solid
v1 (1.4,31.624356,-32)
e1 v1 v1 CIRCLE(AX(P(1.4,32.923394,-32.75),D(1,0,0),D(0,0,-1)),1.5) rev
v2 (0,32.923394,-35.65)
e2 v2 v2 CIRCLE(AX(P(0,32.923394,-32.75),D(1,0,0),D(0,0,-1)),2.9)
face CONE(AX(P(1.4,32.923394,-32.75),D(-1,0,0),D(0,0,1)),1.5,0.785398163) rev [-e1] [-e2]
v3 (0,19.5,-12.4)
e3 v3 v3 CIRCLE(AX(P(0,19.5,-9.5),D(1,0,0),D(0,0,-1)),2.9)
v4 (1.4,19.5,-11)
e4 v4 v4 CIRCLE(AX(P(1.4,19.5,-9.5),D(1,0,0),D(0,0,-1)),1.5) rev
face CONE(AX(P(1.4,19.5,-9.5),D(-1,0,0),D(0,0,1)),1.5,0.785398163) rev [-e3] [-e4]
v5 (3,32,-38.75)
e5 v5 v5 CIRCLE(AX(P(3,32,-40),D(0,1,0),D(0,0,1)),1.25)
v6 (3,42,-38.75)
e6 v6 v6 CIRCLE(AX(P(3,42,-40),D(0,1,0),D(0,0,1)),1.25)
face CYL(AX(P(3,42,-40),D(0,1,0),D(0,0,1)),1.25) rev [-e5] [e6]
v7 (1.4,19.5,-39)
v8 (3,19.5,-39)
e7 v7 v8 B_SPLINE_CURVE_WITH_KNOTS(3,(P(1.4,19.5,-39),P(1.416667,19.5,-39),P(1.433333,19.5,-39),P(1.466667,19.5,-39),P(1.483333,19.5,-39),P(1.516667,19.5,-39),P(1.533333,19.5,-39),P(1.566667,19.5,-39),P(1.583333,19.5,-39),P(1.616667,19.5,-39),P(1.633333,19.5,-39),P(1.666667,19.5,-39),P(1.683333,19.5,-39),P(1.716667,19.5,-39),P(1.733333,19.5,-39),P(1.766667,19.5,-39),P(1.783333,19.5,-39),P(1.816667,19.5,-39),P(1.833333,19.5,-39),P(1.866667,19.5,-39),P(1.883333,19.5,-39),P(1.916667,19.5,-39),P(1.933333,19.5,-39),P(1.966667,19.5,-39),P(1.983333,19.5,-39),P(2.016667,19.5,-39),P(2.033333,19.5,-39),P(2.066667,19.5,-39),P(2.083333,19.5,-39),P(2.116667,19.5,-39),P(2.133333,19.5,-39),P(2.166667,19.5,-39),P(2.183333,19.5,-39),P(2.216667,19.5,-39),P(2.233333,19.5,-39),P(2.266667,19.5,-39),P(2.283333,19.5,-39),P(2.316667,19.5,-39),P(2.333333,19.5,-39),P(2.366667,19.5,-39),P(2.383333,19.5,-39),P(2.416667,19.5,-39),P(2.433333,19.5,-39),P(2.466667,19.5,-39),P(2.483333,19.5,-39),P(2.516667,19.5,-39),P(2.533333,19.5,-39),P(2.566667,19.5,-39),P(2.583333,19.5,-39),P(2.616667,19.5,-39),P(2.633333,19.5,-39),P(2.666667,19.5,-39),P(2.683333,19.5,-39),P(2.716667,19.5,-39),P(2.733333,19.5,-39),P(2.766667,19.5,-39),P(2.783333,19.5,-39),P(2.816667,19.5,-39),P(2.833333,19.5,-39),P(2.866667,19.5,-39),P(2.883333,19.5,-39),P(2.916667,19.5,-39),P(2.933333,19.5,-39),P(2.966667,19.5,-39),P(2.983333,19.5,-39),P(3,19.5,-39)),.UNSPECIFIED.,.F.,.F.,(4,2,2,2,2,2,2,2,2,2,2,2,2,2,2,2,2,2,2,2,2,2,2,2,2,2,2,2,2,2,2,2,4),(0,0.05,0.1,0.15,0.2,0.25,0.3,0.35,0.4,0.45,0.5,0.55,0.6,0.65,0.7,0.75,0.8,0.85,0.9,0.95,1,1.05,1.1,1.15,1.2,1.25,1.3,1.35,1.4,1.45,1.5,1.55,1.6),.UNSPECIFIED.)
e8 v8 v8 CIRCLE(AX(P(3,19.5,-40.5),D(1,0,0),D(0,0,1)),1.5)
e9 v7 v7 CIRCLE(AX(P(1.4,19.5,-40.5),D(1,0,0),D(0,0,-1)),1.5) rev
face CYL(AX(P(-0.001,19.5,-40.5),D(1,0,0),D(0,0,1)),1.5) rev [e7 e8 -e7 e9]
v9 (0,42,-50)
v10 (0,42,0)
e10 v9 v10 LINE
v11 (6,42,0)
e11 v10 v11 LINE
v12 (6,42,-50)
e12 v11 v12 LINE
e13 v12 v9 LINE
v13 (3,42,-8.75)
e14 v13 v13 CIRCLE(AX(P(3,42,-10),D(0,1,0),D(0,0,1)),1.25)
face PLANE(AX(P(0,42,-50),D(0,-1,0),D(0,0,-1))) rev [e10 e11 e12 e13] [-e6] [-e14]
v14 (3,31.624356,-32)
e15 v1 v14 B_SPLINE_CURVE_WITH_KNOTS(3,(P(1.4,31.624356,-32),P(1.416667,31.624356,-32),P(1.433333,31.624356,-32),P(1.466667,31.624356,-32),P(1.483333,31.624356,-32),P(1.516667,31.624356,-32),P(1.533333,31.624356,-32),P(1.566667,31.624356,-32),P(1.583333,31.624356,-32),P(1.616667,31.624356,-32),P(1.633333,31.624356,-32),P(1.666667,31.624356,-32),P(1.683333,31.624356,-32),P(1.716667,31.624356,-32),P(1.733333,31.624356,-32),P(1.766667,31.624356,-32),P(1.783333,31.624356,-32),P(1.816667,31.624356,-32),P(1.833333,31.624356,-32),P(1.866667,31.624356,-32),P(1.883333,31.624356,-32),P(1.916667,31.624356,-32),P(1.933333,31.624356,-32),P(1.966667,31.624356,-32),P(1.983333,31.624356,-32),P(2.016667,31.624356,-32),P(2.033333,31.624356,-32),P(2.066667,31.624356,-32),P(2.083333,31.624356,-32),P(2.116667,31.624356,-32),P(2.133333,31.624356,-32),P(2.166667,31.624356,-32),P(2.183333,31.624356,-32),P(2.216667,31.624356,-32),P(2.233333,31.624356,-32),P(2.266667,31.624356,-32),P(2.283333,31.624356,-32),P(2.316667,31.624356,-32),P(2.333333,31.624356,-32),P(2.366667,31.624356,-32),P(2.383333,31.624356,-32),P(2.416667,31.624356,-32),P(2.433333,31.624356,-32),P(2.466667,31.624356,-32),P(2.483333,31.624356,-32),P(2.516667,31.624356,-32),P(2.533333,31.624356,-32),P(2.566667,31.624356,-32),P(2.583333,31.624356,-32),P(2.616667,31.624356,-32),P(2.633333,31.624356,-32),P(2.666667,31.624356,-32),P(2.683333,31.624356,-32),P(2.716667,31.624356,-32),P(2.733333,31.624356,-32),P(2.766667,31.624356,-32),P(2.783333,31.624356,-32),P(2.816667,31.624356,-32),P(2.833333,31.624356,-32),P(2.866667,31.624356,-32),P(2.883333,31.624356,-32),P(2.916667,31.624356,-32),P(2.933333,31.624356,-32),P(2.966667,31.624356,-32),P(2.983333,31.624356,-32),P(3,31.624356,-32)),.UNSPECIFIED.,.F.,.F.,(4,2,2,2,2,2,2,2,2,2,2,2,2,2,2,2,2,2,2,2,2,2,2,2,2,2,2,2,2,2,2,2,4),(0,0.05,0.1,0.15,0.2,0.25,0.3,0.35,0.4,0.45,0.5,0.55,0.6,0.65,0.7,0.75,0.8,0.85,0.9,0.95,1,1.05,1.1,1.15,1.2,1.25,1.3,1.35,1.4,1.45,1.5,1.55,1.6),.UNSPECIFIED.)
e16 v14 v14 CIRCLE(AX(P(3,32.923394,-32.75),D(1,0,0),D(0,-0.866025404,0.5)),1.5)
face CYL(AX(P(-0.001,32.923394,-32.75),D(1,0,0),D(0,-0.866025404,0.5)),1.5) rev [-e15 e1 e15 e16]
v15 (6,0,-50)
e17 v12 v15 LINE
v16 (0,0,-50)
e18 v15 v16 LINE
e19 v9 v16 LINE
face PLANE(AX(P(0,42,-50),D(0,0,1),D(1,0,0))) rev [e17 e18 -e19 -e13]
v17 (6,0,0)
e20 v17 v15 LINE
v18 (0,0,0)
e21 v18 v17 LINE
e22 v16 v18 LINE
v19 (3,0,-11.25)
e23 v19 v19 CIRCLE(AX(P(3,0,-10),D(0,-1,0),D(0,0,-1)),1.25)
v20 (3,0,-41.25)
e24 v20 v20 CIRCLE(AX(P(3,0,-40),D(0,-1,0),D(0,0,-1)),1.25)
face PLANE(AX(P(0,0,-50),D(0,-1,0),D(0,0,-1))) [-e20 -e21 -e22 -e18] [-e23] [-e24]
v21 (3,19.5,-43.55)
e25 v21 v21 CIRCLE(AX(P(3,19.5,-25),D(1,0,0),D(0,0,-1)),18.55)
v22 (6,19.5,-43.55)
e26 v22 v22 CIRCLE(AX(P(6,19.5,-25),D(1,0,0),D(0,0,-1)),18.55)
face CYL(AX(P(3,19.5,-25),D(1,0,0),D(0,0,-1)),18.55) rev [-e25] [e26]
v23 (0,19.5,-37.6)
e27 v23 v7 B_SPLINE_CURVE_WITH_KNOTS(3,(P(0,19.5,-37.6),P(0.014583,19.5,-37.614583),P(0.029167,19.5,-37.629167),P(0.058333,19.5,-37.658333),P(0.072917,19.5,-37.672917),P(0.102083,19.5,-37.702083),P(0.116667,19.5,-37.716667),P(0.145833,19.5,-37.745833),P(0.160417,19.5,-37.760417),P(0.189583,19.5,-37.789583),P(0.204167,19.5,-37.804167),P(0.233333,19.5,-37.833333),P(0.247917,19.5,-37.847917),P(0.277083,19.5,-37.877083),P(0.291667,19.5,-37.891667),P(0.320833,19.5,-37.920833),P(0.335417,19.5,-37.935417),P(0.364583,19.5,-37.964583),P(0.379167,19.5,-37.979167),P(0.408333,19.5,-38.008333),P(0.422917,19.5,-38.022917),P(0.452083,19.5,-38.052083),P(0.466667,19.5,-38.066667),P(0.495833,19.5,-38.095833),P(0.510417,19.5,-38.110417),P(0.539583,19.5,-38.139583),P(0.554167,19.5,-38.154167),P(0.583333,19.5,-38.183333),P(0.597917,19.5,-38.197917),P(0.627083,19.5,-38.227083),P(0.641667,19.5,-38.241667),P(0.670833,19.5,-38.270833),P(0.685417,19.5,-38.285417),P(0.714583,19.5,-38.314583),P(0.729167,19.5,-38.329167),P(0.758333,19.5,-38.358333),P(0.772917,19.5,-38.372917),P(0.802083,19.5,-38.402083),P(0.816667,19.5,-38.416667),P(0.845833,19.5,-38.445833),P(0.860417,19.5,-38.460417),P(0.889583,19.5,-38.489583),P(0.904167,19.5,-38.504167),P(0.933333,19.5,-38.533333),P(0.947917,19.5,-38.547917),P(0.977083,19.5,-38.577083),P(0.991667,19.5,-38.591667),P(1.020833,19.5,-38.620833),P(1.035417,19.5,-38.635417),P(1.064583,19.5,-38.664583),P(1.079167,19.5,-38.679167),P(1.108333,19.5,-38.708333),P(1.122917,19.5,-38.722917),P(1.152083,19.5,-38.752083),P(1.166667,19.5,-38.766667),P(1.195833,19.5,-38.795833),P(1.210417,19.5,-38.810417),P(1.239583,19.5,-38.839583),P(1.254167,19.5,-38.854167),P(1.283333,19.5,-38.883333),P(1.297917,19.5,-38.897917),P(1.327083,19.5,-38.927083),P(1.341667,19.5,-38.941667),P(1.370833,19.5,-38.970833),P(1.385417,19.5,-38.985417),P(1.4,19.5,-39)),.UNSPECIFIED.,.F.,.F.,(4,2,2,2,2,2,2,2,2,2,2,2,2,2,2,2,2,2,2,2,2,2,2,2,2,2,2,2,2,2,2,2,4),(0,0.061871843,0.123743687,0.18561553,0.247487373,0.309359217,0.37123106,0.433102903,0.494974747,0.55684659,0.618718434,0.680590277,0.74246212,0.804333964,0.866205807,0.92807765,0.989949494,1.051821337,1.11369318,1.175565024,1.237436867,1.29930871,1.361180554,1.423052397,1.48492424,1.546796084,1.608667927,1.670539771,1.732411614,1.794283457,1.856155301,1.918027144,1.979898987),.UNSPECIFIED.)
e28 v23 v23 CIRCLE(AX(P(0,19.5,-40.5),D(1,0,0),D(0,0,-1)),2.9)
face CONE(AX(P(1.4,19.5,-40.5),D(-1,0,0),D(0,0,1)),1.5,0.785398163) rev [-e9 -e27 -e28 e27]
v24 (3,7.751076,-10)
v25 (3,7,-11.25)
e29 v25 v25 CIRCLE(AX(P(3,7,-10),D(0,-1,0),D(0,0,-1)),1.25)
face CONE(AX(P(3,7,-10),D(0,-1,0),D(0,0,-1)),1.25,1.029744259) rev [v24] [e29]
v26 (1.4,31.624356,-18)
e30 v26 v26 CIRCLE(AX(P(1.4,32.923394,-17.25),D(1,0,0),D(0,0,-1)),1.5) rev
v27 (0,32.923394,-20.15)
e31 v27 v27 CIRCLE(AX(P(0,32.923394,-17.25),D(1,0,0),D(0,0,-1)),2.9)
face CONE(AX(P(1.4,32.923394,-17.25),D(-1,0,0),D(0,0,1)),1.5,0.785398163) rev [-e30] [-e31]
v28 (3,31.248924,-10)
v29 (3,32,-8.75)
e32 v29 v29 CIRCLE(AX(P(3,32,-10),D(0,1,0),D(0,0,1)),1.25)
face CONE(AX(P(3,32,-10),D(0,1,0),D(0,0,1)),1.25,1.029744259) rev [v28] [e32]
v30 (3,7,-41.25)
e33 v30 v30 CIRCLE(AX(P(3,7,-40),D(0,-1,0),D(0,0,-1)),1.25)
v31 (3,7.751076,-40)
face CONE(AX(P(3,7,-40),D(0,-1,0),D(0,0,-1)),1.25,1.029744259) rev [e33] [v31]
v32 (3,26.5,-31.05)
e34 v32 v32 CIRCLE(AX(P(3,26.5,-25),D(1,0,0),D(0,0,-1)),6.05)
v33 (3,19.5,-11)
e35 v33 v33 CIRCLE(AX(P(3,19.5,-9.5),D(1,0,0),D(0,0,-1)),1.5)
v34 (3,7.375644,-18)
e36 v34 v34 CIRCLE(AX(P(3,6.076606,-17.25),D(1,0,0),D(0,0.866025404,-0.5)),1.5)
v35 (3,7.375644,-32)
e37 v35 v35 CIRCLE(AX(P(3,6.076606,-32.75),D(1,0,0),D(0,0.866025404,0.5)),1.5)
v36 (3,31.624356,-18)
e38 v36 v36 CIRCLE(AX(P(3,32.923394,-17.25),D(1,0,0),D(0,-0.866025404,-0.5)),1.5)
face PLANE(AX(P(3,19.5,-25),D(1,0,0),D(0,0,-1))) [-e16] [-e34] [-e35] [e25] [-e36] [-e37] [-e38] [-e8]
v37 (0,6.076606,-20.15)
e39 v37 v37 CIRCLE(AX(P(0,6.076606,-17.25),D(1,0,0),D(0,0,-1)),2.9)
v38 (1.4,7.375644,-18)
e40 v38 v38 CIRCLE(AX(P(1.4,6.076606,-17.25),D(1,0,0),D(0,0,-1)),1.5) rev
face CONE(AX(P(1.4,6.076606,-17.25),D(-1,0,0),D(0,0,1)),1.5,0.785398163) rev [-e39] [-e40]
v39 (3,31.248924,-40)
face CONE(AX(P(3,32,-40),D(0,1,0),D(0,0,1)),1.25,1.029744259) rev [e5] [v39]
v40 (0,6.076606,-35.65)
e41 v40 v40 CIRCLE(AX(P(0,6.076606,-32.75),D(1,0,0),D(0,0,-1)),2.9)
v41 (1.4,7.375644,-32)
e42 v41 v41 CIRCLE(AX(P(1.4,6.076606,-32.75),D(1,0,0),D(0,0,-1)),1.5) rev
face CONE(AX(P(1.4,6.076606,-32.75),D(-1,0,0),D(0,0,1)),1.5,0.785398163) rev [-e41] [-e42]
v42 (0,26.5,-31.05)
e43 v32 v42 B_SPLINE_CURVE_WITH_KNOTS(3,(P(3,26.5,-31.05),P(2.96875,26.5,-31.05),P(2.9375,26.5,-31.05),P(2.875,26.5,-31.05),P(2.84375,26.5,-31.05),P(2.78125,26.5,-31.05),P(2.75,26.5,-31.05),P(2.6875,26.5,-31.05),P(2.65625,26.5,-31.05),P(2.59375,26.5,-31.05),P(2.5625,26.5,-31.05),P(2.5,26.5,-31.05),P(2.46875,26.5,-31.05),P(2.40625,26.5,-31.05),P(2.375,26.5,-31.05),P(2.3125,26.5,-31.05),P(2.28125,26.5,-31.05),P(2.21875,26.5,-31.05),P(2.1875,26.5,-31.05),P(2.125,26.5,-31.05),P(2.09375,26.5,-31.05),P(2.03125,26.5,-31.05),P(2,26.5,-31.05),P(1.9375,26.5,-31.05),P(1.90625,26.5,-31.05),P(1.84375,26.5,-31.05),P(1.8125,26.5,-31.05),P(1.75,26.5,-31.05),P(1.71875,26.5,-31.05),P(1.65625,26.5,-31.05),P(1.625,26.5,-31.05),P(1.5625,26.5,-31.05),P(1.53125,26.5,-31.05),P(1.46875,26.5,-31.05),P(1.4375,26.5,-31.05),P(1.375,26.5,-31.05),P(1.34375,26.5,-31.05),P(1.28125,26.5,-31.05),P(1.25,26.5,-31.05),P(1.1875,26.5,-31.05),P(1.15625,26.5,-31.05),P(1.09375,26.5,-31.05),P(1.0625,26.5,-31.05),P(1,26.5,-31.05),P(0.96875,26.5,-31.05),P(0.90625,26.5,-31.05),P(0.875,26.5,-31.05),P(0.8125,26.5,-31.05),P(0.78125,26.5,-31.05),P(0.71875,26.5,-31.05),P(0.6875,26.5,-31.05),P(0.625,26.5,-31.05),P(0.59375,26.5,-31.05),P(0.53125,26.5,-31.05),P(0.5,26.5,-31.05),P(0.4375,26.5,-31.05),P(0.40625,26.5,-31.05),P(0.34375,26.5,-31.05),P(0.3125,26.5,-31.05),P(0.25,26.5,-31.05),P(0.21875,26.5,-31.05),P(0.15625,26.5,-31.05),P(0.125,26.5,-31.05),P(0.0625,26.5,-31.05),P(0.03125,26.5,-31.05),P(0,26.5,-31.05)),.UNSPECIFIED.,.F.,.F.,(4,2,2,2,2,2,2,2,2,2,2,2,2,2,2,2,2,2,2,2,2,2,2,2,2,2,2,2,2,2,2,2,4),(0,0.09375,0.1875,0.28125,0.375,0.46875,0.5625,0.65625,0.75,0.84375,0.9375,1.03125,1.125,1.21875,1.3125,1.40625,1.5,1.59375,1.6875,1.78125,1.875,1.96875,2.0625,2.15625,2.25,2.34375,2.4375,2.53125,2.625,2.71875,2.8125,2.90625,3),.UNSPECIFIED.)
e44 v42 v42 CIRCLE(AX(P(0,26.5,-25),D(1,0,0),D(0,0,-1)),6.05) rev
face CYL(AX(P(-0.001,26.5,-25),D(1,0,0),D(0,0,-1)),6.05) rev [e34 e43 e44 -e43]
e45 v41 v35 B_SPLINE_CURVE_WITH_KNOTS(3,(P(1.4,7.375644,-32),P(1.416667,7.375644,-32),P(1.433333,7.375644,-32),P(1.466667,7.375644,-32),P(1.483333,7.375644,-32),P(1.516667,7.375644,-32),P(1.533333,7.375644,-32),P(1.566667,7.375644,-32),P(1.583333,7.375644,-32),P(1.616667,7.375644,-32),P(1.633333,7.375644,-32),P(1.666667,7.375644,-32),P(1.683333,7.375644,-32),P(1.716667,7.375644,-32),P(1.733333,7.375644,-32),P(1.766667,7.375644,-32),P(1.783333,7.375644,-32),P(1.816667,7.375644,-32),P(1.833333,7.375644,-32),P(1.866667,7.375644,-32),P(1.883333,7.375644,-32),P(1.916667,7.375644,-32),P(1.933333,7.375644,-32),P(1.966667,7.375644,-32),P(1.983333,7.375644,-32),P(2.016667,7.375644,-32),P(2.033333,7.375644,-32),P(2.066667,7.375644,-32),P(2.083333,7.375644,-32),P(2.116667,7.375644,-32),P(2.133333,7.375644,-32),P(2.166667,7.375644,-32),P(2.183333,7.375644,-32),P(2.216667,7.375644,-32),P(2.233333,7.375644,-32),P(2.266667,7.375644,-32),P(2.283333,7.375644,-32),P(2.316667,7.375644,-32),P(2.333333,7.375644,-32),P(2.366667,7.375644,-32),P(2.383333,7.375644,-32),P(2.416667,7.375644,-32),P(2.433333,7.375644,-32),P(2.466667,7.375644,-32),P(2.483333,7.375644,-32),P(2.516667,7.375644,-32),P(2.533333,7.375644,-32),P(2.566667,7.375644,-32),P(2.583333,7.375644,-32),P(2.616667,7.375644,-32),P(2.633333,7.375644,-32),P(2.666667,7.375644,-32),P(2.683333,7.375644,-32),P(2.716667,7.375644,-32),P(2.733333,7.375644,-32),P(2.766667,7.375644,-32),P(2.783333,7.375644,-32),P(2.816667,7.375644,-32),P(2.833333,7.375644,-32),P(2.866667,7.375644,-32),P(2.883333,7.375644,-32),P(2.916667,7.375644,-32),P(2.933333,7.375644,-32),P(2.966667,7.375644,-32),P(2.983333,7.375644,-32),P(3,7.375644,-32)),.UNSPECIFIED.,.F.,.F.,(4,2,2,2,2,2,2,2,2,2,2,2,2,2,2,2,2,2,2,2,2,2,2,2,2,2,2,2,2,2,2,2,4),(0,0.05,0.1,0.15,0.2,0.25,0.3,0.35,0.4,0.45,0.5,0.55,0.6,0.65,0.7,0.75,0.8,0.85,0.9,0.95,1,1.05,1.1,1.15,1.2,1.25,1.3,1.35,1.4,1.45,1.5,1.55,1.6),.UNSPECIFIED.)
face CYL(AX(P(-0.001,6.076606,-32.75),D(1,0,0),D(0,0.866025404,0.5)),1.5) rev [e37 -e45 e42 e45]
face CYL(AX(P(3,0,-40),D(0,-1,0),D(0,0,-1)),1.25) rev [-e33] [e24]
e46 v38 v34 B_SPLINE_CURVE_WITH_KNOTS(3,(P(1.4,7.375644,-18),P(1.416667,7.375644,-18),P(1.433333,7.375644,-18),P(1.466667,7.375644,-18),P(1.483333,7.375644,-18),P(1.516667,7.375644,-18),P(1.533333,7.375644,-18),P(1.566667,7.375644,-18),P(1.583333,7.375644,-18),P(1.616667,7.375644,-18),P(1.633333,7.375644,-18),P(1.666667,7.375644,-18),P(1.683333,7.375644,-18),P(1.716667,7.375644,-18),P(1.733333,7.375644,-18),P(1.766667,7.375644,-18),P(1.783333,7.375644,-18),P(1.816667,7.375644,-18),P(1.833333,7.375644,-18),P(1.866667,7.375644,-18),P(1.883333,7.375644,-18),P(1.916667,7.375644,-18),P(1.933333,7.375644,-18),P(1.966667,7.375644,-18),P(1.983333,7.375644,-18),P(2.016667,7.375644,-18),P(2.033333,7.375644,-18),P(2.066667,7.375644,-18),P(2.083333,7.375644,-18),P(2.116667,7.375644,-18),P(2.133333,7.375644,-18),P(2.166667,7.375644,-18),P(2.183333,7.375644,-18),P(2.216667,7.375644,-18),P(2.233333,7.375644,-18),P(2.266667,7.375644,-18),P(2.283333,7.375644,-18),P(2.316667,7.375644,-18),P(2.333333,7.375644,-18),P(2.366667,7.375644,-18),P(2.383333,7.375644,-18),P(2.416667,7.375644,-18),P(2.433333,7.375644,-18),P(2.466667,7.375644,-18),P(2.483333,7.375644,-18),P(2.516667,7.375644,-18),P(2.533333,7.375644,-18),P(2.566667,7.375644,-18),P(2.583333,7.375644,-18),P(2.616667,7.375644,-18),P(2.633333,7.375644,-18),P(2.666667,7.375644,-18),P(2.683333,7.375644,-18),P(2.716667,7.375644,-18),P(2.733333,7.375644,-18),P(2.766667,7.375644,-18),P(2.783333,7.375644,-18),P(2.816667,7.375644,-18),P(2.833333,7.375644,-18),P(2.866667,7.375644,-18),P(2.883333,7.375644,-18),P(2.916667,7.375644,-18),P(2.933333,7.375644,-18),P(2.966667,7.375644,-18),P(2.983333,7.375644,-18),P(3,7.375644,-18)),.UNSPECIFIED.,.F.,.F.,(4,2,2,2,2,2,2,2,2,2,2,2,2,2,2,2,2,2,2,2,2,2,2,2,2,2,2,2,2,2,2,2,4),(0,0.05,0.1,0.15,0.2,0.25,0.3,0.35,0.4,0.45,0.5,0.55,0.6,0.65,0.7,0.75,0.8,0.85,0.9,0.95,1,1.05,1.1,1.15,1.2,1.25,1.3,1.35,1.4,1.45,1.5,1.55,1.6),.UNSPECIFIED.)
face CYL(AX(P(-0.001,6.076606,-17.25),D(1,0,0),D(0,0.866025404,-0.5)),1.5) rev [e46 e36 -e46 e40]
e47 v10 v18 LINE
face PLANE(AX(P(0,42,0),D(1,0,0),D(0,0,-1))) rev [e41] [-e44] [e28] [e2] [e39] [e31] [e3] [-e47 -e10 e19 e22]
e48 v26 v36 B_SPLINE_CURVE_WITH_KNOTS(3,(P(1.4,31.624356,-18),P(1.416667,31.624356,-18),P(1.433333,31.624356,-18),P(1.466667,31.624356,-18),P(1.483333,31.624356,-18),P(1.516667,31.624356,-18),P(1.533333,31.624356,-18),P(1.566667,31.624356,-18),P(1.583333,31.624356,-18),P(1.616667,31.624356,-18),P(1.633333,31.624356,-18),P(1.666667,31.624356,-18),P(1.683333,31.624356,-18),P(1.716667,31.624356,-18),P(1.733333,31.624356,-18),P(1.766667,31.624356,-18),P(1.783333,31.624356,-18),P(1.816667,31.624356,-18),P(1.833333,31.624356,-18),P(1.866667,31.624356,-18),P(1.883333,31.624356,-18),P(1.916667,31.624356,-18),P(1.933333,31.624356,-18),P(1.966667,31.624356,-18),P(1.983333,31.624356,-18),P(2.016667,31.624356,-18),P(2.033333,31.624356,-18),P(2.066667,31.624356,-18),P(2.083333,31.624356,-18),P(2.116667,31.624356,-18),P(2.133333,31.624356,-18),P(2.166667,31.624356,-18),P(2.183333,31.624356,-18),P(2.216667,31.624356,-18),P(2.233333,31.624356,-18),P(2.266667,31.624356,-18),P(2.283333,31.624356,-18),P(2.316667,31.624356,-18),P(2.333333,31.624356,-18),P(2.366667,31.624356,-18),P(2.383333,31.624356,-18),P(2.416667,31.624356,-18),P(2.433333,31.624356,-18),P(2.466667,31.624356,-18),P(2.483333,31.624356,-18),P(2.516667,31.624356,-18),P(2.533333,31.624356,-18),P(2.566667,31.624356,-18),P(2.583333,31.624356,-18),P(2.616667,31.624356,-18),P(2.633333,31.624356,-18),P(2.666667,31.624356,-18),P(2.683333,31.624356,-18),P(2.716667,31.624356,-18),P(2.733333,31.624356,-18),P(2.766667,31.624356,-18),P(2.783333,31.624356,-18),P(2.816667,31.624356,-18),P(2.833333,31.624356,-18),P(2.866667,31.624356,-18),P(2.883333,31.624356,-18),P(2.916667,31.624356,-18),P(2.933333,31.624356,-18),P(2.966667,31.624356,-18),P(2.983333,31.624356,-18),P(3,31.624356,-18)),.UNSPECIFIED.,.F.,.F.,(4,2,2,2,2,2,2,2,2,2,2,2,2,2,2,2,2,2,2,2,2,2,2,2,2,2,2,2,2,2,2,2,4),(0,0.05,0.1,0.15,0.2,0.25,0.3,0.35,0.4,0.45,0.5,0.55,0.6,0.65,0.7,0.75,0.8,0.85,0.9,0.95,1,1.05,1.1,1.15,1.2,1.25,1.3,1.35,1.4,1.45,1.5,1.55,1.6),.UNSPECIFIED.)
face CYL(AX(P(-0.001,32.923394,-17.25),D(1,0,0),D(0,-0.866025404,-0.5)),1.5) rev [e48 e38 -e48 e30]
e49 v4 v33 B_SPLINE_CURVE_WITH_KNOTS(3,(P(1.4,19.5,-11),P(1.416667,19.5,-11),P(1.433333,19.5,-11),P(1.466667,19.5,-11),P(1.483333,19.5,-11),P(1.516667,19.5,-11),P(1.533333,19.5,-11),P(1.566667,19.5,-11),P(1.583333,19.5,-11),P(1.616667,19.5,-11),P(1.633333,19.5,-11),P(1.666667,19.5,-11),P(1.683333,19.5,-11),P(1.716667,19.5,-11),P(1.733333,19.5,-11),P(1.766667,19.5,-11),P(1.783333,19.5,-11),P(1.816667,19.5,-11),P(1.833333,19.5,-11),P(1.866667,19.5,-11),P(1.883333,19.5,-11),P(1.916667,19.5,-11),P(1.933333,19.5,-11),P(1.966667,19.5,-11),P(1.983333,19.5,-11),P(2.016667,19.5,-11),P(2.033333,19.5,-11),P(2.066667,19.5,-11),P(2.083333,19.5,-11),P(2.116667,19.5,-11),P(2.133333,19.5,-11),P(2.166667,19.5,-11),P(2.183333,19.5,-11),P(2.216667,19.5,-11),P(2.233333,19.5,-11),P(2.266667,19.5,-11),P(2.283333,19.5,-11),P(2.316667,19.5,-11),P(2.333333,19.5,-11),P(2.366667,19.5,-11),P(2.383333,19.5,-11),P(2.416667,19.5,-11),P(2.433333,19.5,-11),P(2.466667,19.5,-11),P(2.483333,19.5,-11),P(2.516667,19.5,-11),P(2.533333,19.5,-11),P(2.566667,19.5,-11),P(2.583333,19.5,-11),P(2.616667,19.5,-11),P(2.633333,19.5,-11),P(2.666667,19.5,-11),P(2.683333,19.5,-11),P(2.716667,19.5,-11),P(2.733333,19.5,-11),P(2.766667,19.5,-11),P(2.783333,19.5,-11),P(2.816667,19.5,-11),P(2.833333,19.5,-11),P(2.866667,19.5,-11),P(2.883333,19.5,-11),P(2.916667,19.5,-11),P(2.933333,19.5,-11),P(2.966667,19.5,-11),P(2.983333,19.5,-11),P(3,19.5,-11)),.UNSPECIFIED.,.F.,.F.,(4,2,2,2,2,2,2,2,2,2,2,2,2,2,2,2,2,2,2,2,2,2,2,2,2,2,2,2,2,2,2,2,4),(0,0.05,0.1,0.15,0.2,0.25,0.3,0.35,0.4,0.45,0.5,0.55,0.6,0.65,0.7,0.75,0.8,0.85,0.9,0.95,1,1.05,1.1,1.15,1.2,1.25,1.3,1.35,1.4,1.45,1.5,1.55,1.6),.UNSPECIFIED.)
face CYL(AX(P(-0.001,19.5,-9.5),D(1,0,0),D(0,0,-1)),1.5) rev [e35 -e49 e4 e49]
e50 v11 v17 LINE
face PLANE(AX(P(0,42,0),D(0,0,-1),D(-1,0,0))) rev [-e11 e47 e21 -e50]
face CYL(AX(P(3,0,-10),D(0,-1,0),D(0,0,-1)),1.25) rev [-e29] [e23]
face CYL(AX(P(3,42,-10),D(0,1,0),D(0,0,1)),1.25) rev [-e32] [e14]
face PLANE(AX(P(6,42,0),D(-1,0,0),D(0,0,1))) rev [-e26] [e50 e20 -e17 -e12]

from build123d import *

# Parameters (mm, degrees)
SKETCH1_W                   = 6
SKETCH1_H                   = 50
BOSS_EXTRUDE1_DEPTH         = 42
TAP_DRILL_FOR_M3_TAP1_D     = 2.5
TAP_DRILL_FOR_M3_TAP1_DEPTH = 10
TAP_DRILL_FOR_M3_TAP1_TIP   = 0.751075774
TAP_DRILL_FOR_M3_TAP2_D     = 2.5
TAP_DRILL_FOR_M3_TAP2_DEPTH = 7
TAP_DRILL_FOR_M3_TAP2_TIP   = 0.751075774
SKETCH6_R                   = 18.55
CUT_EXTRUDE1_DEPTH          = 3
CUT_EXTRUDE2_REACH          = 67.368
SKETCH7_R                   = 6.05
SKETCH7_R_2                 = 1.5
CIRPATTERN1_OUTLINE_R       = 1.5
CIRPATTERN1_DEPTH           = 3
CHAMFER1_SIZE               = 1.4


# Read off the part's stored shape, not the designer's step: CirPattern1
with BuildPart() as part:
    # Sketch1 → Boss-Extrude1 (new body)
    with BuildSketch(Plane(origin=(0, 0, 0), x_dir=(1, 0, 0), z_dir=(0, 1, 0))):
        with Locations((3, 25)):
            Rectangle(SKETCH1_W, SKETCH1_H)
    extrude(amount=BOSS_EXTRUDE1_DEPTH)

    # Tap Drill for M3 Tap1
    with Locations(Plane(origin=(0, 42, 0), x_dir=(-1, 0, 0), z_dir=(0, 1, 0))):
        with Locations((-3, -10), (-3, -40)):
            Hole(TAP_DRILL_FOR_M3_TAP1_D / 2, depth=TAP_DRILL_FOR_M3_TAP1_DEPTH)
            with Locations((0, 0, -(TAP_DRILL_FOR_M3_TAP1_DEPTH + TAP_DRILL_FOR_M3_TAP1_TIP / 2))):  # 118° drill point
                Cone(0, TAP_DRILL_FOR_M3_TAP1_D / 2, TAP_DRILL_FOR_M3_TAP1_TIP, mode=Mode.SUBTRACT)

    # Tap Drill for M3 Tap2
    with Locations(Plane.XZ):
        with Locations((3, -10), (3, -40)):
            Hole(TAP_DRILL_FOR_M3_TAP2_D / 2, depth=TAP_DRILL_FOR_M3_TAP2_DEPTH)
            with Locations((0, 0, -(TAP_DRILL_FOR_M3_TAP2_DEPTH + TAP_DRILL_FOR_M3_TAP2_TIP / 2))):  # 118° drill point
                Cone(0, TAP_DRILL_FOR_M3_TAP2_D / 2, TAP_DRILL_FOR_M3_TAP2_TIP, mode=Mode.SUBTRACT)

    # Sketch6 → Cut-Extrude1 (cut)
    with BuildSketch(Plane(origin=(6, 0, 0), x_dir=(0, 0, -1), z_dir=(1, 0, 0))):
        with Locations((25, 19.5)):
            Circle(SKETCH6_R)
    extrude(amount=-CUT_EXTRUDE1_DEPTH, mode=Mode.SUBTRACT)

    # Sketch7 → Cut-Extrude2 (cut, up to next)
    with BuildSketch(Plane(origin=(3, 0, 0), x_dir=(0, 0, -1), z_dir=(1, 0, 0)), mode=Mode.PRIVATE) as cut_extrude2_sk1:
        with Locations((25, 26.5)):
            Circle(SKETCH7_R)
    cut_extrude2_tool1 = extrude(cut_extrude2_sk1.sketch, amount=-CUT_EXTRUDE2_REACH, mode=Mode.PRIVATE) & part.part
    # Sketch7 → Cut-Extrude2 (cut, up to next)
    with BuildSketch(Plane(origin=(3, 0, 0), x_dir=(0, 0, -1), z_dir=(1, 0, 0)), mode=Mode.PRIVATE) as cut_extrude2_sk2:
        with Locations((9.5, 19.5)):
            Circle(SKETCH7_R_2)
    cut_extrude2_tool2 = extrude(cut_extrude2_sk2.sketch, amount=-CUT_EXTRUDE2_REACH, mode=Mode.PRIVATE) & part.part
    add(cut_extrude2_tool1.solids().sort_by_distance((3, 26.5, -25))[0], mode=Mode.SUBTRACT)
    add(cut_extrude2_tool2.solids().sort_by_distance((3, 19.5, -9.5))[0], mode=Mode.SUBTRACT)

    # CirPattern1 outline → CirPattern1 (cut)
    with BuildSketch(Plane.YZ):
        with Locations((32.923393759, -17.25)):
            Circle(CIRPATTERN1_OUTLINE_R)
        with Locations((32.923393759, -32.75)):
            Circle(CIRPATTERN1_OUTLINE_R)
        with Locations((19.5, -40.5)):
            Circle(CIRPATTERN1_OUTLINE_R)
        with Locations((6.076606241, -32.75)):
            Circle(CIRPATTERN1_OUTLINE_R)
        with Locations((6.076606241, -17.25)):
            Circle(CIRPATTERN1_OUTLINE_R)
    extrude(amount=CIRPATTERN1_DEPTH, mode=Mode.SUBTRACT)

    # Chamfer1
    chamfer1_edges = [part.edges().sort_by_distance(p)[0] for p in [
        (0, 19.5, -8),
        (0, 4.576606241, -17.25),
        (0, 4.576606241, -32.75),
        (0, 18, -40.5),
        (0, 31.423393759, -32.75),
        (0, 31.423393759, -17.25),
    ]]
    chamfer(chamfer1_edges, length=CHAMFER1_SIZE)


solid = part.part
